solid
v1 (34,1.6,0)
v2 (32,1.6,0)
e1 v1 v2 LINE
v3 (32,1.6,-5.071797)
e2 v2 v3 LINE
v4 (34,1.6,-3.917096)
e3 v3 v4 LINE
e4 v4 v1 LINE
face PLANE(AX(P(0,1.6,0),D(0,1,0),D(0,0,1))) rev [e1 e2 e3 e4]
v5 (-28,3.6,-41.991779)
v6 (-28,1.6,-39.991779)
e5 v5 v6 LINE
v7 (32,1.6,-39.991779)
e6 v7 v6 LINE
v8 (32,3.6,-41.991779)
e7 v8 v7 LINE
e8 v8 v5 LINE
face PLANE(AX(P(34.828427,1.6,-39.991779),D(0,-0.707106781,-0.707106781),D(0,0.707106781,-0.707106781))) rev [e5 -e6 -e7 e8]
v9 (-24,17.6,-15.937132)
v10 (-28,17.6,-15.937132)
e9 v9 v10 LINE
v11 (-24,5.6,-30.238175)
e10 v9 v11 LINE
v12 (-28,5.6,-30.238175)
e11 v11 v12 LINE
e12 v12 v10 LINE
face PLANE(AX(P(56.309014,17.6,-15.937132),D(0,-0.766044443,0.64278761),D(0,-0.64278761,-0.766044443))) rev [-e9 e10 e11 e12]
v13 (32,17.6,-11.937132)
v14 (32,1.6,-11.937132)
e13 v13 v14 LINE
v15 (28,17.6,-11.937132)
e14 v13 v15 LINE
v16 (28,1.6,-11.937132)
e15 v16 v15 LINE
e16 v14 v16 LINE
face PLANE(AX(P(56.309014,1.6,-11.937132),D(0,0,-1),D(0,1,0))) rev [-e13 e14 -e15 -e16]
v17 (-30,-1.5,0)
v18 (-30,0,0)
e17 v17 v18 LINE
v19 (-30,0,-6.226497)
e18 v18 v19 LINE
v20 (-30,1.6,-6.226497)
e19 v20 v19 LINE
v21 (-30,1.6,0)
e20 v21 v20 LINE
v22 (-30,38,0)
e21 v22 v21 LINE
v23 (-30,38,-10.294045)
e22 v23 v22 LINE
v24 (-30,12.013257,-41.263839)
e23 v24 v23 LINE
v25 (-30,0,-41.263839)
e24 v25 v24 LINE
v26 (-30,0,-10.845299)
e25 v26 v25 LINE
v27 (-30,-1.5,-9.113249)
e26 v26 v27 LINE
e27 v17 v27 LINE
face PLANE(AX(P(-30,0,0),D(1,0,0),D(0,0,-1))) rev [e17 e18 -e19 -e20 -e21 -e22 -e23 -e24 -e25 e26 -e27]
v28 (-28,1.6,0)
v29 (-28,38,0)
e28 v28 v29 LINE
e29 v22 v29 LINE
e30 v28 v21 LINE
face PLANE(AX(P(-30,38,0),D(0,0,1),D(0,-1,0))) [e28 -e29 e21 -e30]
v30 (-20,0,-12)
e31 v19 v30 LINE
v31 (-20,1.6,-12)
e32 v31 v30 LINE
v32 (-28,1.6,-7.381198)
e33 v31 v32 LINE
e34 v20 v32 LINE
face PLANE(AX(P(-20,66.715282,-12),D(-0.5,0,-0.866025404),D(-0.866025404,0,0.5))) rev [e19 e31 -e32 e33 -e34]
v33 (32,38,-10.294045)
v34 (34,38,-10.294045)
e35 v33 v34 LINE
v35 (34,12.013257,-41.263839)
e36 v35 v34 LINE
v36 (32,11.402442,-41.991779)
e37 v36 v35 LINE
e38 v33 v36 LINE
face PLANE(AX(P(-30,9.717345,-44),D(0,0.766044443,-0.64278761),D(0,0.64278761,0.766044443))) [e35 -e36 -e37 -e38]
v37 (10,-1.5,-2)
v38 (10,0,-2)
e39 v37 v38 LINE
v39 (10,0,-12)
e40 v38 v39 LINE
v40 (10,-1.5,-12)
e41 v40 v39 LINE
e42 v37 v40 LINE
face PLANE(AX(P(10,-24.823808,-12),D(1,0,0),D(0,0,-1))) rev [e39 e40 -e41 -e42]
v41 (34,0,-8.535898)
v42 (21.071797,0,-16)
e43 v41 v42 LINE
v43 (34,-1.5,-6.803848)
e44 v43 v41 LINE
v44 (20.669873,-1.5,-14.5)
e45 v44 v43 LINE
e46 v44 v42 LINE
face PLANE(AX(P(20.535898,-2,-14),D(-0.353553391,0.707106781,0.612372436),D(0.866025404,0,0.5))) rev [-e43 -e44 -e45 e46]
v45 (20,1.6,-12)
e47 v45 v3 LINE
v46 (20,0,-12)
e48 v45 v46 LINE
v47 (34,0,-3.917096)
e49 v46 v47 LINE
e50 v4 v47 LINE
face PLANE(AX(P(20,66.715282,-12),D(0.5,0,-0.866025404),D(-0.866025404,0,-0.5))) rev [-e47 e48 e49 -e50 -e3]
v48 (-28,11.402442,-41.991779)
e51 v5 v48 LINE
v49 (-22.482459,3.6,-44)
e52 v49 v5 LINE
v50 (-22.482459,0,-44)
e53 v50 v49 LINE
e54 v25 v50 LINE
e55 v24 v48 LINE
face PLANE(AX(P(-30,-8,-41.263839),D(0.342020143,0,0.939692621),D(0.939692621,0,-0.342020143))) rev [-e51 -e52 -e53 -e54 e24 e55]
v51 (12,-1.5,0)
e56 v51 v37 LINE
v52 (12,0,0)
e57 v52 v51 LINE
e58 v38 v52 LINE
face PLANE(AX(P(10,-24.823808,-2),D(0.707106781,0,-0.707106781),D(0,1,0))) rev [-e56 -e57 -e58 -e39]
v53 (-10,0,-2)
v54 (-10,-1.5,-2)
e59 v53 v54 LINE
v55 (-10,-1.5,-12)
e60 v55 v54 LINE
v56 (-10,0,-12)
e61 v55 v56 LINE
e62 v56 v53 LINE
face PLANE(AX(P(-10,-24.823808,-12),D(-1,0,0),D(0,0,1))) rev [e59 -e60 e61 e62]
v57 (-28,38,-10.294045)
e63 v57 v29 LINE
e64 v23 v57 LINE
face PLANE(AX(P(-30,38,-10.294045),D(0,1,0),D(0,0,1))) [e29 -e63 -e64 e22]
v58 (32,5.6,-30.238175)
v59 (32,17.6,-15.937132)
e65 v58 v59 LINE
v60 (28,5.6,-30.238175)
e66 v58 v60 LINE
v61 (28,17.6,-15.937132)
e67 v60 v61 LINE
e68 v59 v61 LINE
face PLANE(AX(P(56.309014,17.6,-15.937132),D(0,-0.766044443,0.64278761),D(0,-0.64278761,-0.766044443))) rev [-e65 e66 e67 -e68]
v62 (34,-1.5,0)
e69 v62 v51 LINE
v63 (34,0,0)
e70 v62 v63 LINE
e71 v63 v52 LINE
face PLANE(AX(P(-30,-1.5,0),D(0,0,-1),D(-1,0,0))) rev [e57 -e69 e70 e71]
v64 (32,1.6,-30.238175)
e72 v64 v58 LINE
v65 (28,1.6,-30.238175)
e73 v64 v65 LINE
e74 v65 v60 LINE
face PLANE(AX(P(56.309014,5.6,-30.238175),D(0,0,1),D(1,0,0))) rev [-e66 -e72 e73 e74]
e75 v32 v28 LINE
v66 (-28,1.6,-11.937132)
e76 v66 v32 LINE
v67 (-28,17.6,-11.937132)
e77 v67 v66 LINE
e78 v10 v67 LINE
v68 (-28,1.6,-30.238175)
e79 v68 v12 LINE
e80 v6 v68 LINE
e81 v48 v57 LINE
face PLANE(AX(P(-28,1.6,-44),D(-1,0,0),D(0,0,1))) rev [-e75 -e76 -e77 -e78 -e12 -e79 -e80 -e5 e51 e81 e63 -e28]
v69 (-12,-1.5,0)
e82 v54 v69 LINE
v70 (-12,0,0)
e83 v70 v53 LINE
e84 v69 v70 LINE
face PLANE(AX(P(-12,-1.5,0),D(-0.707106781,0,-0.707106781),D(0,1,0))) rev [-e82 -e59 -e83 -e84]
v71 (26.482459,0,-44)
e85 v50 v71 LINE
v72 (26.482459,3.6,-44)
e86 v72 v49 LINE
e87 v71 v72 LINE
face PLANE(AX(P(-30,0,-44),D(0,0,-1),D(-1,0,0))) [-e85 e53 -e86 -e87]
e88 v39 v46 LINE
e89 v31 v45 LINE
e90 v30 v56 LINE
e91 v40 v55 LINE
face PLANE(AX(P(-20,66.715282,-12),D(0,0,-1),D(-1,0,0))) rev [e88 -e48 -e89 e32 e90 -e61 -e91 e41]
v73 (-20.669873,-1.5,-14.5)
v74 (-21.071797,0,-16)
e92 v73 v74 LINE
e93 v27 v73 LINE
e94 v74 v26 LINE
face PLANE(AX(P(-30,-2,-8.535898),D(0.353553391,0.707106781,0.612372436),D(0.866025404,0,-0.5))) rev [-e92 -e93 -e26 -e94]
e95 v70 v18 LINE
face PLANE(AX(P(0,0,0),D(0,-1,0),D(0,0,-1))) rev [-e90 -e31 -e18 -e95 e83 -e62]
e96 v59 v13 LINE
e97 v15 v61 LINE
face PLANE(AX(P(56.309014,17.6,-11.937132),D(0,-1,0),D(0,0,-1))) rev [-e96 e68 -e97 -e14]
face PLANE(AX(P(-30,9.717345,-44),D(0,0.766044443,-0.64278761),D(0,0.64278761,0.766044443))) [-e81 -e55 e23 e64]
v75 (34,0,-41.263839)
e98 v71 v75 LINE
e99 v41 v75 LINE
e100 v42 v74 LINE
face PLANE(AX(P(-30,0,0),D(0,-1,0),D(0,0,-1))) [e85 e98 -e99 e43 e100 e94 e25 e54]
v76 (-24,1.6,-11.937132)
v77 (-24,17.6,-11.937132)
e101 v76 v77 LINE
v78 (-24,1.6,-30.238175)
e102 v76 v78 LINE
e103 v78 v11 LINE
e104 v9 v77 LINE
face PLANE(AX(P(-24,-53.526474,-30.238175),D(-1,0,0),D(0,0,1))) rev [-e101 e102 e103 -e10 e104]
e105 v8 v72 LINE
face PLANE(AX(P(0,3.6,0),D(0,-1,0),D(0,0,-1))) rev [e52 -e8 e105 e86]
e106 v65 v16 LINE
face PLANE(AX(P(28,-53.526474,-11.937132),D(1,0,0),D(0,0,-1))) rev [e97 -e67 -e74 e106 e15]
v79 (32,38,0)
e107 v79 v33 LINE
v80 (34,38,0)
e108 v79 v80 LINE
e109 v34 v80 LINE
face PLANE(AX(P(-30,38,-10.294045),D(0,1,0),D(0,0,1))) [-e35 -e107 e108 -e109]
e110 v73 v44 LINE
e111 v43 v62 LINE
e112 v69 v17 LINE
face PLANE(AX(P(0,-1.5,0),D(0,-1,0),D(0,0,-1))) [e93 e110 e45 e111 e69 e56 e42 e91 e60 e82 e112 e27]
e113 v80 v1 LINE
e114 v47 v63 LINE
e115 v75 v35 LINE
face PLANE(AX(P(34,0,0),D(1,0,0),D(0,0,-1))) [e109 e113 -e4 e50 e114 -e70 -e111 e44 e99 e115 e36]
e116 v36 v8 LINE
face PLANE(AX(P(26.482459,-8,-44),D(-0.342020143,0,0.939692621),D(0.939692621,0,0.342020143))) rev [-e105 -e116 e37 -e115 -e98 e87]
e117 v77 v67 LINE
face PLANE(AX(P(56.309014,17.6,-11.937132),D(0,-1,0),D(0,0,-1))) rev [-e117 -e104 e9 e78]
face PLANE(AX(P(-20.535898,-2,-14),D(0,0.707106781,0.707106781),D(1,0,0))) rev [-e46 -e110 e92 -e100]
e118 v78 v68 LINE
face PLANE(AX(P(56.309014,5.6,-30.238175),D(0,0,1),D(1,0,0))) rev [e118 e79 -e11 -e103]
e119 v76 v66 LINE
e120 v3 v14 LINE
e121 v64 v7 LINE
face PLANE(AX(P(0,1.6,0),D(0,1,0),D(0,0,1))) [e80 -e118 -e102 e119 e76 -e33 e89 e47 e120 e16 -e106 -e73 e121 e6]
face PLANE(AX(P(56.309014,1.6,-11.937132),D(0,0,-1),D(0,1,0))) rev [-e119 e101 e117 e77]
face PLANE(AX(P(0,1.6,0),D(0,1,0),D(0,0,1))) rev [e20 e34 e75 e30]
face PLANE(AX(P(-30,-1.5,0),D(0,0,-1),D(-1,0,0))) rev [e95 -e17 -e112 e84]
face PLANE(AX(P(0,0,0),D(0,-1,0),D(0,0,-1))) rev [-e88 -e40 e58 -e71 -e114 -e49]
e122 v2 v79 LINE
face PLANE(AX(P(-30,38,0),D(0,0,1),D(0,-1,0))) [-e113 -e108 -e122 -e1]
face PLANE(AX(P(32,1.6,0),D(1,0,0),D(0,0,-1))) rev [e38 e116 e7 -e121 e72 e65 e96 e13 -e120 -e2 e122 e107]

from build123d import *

# Parameters (mm, degrees)
BOSS_EXTRUDE1_DEPTH      = 34
BOSS_EXTRUDE1_DEPTH_BACK = 30
SKETCH2_W                = 60
SKETCH2_H                = 44
CUT_EXTRUDE1_DEPTH       = 36.4
CUT_EXTRUDE2_DEPTH       = 1.6
BOSS_EXTRUDE2_DEPTH      = 1.5
CHAMFER1_SIZE            = 2
CUT_EXTRUDE3_REACH       = 70.207
SKETCH8_W                = 20
SKETCH8_H                = 12
CUT_EXTRUDE4_DEPTH       = 1.5
BOSS_EXTRUDE3_REACH      = 86.994
CUT_EXTRUDE7_REACH       = 61.23
SKETCH12_W               = 52
SKETCH12_H               = 18.301043111
CHAMFER2_SIZE            = 2
BOSS_EXTRUDE4_DEPTH      = 60
BOSS_EXTRUDE5_DEPTH      = 2


with BuildPart() as part:
    # Sketch1 → Boss-Extrude1 (new, two sides: drawn at the far end of the back side and taken through both)
    with BuildSketch(Plane(origin=(0, 0, 0), x_dir=(0, 0, -1), z_dir=(1, 0, 0)).offset(-BOSS_EXTRUDE1_DEPTH_BACK)):
        Polygon((0, 38), (0, 0), (44, 0), (44, 9.717345174), (10.294044503, 38), align=None)
    extrude(amount=BOSS_EXTRUDE1_DEPTH + BOSS_EXTRUDE1_DEPTH_BACK)

    # Sketch2 → Cut-Extrude1 (cut)
    with BuildSketch(Plane(origin=(0, 38, 0), x_dir=(1, 0, 0), z_dir=(0, 1, 0))):
        with Locations((2, 22)):
            Rectangle(SKETCH2_W, SKETCH2_H)
    extrude(amount=-CUT_EXTRUDE1_DEPTH, mode=Mode.SUBTRACT)

    # Sketch5 → Cut-Extrude2 (cut)
    with BuildSketch(Plane.XZ):
        Polygon((-20, -12), (20, -12), (34, -3.917096231), (34, 0), (-30, 0), (-30, -6.226497308), align=None)
    extrude(amount=-CUT_EXTRUDE2_DEPTH, mode=Mode.SUBTRACT)

    # Sketch6 → Boss-Extrude2 (add)
    with BuildSketch(Plane.XZ):
        Polygon((-30, 0), (-30, -8.535898385), (-20.535898385, -14), (20.535898385, -14), (34, -6.226497308), (34, 0), align=None)
    extrude(amount=BOSS_EXTRUDE2_DEPTH)

    # Chamfer1
    # the kernel refuses this chamfer: 2 mm, written as the material it adds along each edge
    with BuildSketch(Plane(origin=(16.081612789, 0, -16.571682988), x_dir=(0.4998109584556485, 0.027495876610586344, -0.8656979742248803), z_dir=(0.8660254037844386, 0, 0.5000000000000001))) as chamfer1_piece_1_section:
        Polygon((CHAMFER1_SIZE * 0.999621916911, -CHAMFER1_SIZE * 0.0274958766106), (-CHAMFER1_SIZE * 0.0274958766106, -CHAMFER1_SIZE * 0.999621916911), (0, 0), align=None)
    chamfer1_piece_1 = extrude(amount=25.833737336, mode=Mode.PRIVATE)
    chamfer1_piece_1 = split(chamfer1_piece_1, bisect_by=Plane(origin=(34, -0.590941393, -10.495986371), z_dir=(-1, 0, 0)), keep=Keep.TOP, mode=Mode.PRIVATE)
    chamfer1_piece_1 = split(chamfer1_piece_1, bisect_by=Plane(origin=(27.930870364, -0.590941393, -14), z_dir=(0, 0, 1)), keep=Keep.TOP, mode=Mode.PRIVATE)
    chamfer1_piece_1 = split(chamfer1_piece_1, bisect_by=Plane(origin=(27.930870364, -1.5, -10.495986371), z_dir=(0, 1, 0)), keep=Keep.TOP, mode=Mode.PRIVATE)
    add(chamfer1_piece_1)
    with BuildSketch(Plane(origin=(-34.454285596, 0, -5.964215397), x_dir=(-0.4998109584556484, 0.027495876610586348, -0.8656979742248804), z_dir=(0.8660254037844387, 0, -0.5))) as chamfer1_piece_2_section:
        Polygon((CHAMFER1_SIZE * 0.999621916911, -CHAMFER1_SIZE * 0.0274958766106), (-CHAMFER1_SIZE * 0.0274958766106, -CHAMFER1_SIZE * 0.999621916911), (0, 0), align=None)
    chamfer1_piece_2 = extrude(amount=21.214935182, mode=Mode.PRIVATE)
    chamfer1_piece_2 = split(chamfer1_piece_2, bisect_by=Plane(origin=(-30, -0.598869914, -11.638934736), z_dir=(1, 0, 0)), keep=Keep.TOP, mode=Mode.PRIVATE)
    chamfer1_piece_2 = split(chamfer1_piece_2, bisect_by=Plane(origin=(-25.910515002, -1.5, -11.638934736), z_dir=(0, 1, 0)), keep=Keep.TOP, mode=Mode.PRIVATE)
    chamfer1_piece_2 = split(chamfer1_piece_2, bisect_by=Plane(origin=(-25.910515002, -0.598869914, -14), z_dir=(0, 0, 1)), keep=Keep.TOP, mode=Mode.PRIVATE)
    add(chamfer1_piece_2)
    with BuildSketch(Plane(origin=(-25.679264361, 0, -14), x_dir=(0, 0.027495876610586424, -0.9996219169112968), z_dir=(1, 0, 0))) as chamfer1_piece_3_section:
        Polygon((CHAMFER1_SIZE * 0.999621916911, -CHAMFER1_SIZE * 0.0274958766106), (-CHAMFER1_SIZE * 0.0274958766106, -CHAMFER1_SIZE * 0.999621916911), (0, 0), align=None)
    chamfer1_piece_3 = extrude(amount=51.358528722, mode=Mode.PRIVATE)
    chamfer1_piece_3 = split(chamfer1_piece_3, bisect_by=Plane(origin=(4.838764491, -0.58360414, -23.062744479), z_dir=(-0.5000000000000001, 0, 0.8660254037844386)), keep=Keep.TOP, mode=Mode.PRIVATE)
    chamfer1_piece_3 = split(chamfer1_piece_3, bisect_by=Plane(origin=(0, -1.5, -14.681758534), z_dir=(0, 1, 0)), keep=Keep.TOP, mode=Mode.PRIVATE)
    chamfer1_piece_3 = split(chamfer1_piece_3, bisect_by=Plane(origin=(-4.838764491, -0.58360414, -23.062744479), z_dir=(0.5, 0, 0.8660254037844387)), keep=Keep.TOP, mode=Mode.PRIVATE)
    add(chamfer1_piece_3)
    with BuildSketch(Plane(origin=(16.081612789, 0, -16.571682988), x_dir=(0.4998109584556485, 0.027495876610586344, -0.8656979742248803), z_dir=(0.8660254037844386, 0, 0.5000000000000001))) as chamfer1_piece_4a_section:
        Polygon((CHAMFER1_SIZE * 0.999621916911, -CHAMFER1_SIZE * 0.0274958766106), (-CHAMFER1_SIZE * 0.0274958766106, -CHAMFER1_SIZE * 0.999621916911), (0, 0), align=None)
    chamfer1_piece_4a = extrude(amount=25.833737336, mode=Mode.PRIVATE)
    chamfer1_piece_4a = split(chamfer1_piece_4a, bisect_by=Plane(origin=(19.272748758, -0.548768343, -14), z_dir=(0, 0, -1)), keep=Keep.TOP, mode=Mode.PRIVATE)
    chamfer1_piece_4a = split(chamfer1_piece_4a, bisect_by=Plane(origin=(19.272748758, -1.5, -15.619778524), z_dir=(0, 1, 0)), keep=Keep.TOP, mode=Mode.PRIVATE)
    with BuildSketch(Plane(origin=(-25.679264361, 0, -14), x_dir=(0, 0.027495876610586424, -0.9996219169112968), z_dir=(1, 0, 0))) as chamfer1_piece_4b_section:
        Polygon((CHAMFER1_SIZE * 0.999621916911, -CHAMFER1_SIZE * 0.0274958766106), (-CHAMFER1_SIZE * 0.0274958766106, -CHAMFER1_SIZE * 0.999621916911), (0, 0), align=None)
    chamfer1_piece_4b = extrude(amount=51.358528722, mode=Mode.PRIVATE)
    chamfer1_piece_4b = split(chamfer1_piece_4b, bisect_by=Plane(origin=(21.62981805, -0.548768343, -13.368425187), z_dir=(0.5000000000000001, 0, -0.8660254037844386)), keep=Keep.TOP, mode=Mode.PRIVATE)
    chamfer1_piece_4b = split(chamfer1_piece_4b, bisect_by=Plane(origin=(22.439707312, -1.5, -14.771194537), z_dir=(0, 1, 0)), keep=Keep.TOP, mode=Mode.PRIVATE)
    chamfer1_piece_4 = chamfer1_piece_4a & chamfer1_piece_4b
    add(chamfer1_piece_4)
    with BuildSketch(Plane(origin=(-25.679264361, 0, -14), x_dir=(0, 0.027495876610586424, -0.9996219169112968), z_dir=(1, 0, 0))) as chamfer1_piece_5a_section:
        Polygon((CHAMFER1_SIZE * 0.999621916911, -CHAMFER1_SIZE * 0.0274958766106), (-CHAMFER1_SIZE * 0.0274958766106, -CHAMFER1_SIZE * 0.999621916911), (0, 0), align=None)
    chamfer1_piece_5a = extrude(amount=51.358528722, mode=Mode.PRIVATE)
    chamfer1_piece_5a = split(chamfer1_piece_5a, bisect_by=Plane(origin=(-22.439707312, -1.5, -14.771194537), z_dir=(0, 1, 0)), keep=Keep.TOP, mode=Mode.PRIVATE)
    chamfer1_piece_5a = split(chamfer1_piece_5a, bisect_by=Plane(origin=(-21.62981805, -0.548768343, -13.368425187), z_dir=(-0.5, 0, -0.8660254037844387)), keep=Keep.TOP, mode=Mode.PRIVATE)
    with BuildSketch(Plane(origin=(-34.454285596, 0, -5.964215397), x_dir=(-0.4998109584556484, 0.027495876610586348, -0.8656979742248804), z_dir=(0.8660254037844387, 0, -0.5))) as chamfer1_piece_5b_section:
        Polygon((CHAMFER1_SIZE * 0.999621916911, -CHAMFER1_SIZE * 0.0274958766106), (-CHAMFER1_SIZE * 0.0274958766106, -CHAMFER1_SIZE * 0.999621916911), (0, 0), align=None)
    chamfer1_piece_5b = extrude(amount=21.214935182, mode=Mode.PRIVATE)
    chamfer1_piece_5b = split(chamfer1_piece_5b, bisect_by=Plane(origin=(-19.272748758, -1.5, -15.619778524), z_dir=(0, 1, 0)), keep=Keep.TOP, mode=Mode.PRIVATE)
    chamfer1_piece_5b = split(chamfer1_piece_5b, bisect_by=Plane(origin=(-19.272748758, -0.548768343, -14), z_dir=(0, 0, -1)), keep=Keep.TOP, mode=Mode.PRIVATE)
    chamfer1_piece_5 = chamfer1_piece_5a & chamfer1_piece_5b
    add(chamfer1_piece_5)

    # Cut-Extrude3: up to this face of the body (flat: up to its plane)
    cut_extrude3_end = Plane(part.part.faces().sort_by_distance((2.35859889, 0, -29.378927014))[0])
    # Sketch7 → Cut-Extrude3 (cut, up to the picked face)
    with BuildSketch(Plane(origin=(0, 38, 0), x_dir=(1, 0, 0), z_dir=(0, 1, 0)), mode=Mode.PRIVATE) as cut_extrude3_sk1:
        Polygon((-30, 41.263838853), (-22.482459034, 44), (-30, 44), align=None)
    cut_extrude3_tool1 = split(extrude(cut_extrude3_sk1.sketch, amount=-CUT_EXTRUDE3_REACH, mode=Mode.PRIVATE), bisect_by=cut_extrude3_end, keep=Keep.BOTH, mode=Mode.PRIVATE)
    # Sketch7 → Cut-Extrude3 (cut, up to the picked face)
    with BuildSketch(Plane(origin=(0, 38, 0), x_dir=(1, 0, 0), z_dir=(0, 1, 0)), mode=Mode.PRIVATE) as cut_extrude3_sk2:
        Polygon((26.482459034, 44), (34, 41.263838853), (34, 44), align=None)
    cut_extrude3_tool2 = split(extrude(cut_extrude3_sk2.sketch, amount=-CUT_EXTRUDE3_REACH, mode=Mode.PRIVATE), bisect_by=cut_extrude3_end, keep=Keep.BOTH, mode=Mode.PRIVATE)
    add(cut_extrude3_tool1.solids().sort_by(Axis((-27.494153, 38, -43.087946), (0, -1, 0)))[0], mode=Mode.SUBTRACT)
    add(cut_extrude3_tool2.solids().sort_by(Axis((31.494153, 38, -43.087946), (0, -1, 0)))[0], mode=Mode.SUBTRACT)

    # Sketch8 → Cut-Extrude4 (cut)
    with BuildSketch(Plane(origin=(0, 0, 0), x_dir=(1, 0, 0), z_dir=(0, 1, 0))):
        with Locations((0, 6)):
            Rectangle(SKETCH8_W, SKETCH8_H)
    extrude(amount=-CUT_EXTRUDE4_DEPTH, mode=Mode.SUBTRACT)

    # Boss-Extrude3: up to this face of the body (flat: up to its plane)
    boss_extrude3_end = Plane(part.part.faces().sort_by_distance((32, 16.245464339, -17.024050876))[0])
    # Sketch11 → Boss-Extrude3 (add, up to the picked face)
    with BuildSketch(Plane(origin=(-28, 0, 0), x_dir=(0, 0, -1), z_dir=(1, 0, 0)), mode=Mode.PRIVATE) as boss_extrude3_sk1:
        Polygon((15.937131869, 17.6), (30.23817498, 5.6), (30.23817498, 1.6), (11.937131869, 1.6), (11.937131869, 17.6), align=None)
    boss_extrude3_tool1 = split(extrude(boss_extrude3_sk1.sketch, amount=BOSS_EXTRUDE3_REACH, mode=Mode.PRIVATE), bisect_by=boss_extrude3_end, keep=Keep.BOTH, mode=Mode.PRIVATE)
    add(boss_extrude3_tool1.solids().sort_by(Axis((-28, 7.941992, -19.27068), (1, 0, 0)))[0])

    # Cut-Extrude7: up to this face of the body (flat: up to its plane)
    cut_extrude7_end = Plane(part.part.faces().sort_by_distance((2, 1.6, -37.034599694))[0])
    # Sketch12 → Cut-Extrude7 (cut, up to the picked face)
    with BuildSketch(Plane(origin=(0, 17.6, 0), x_dir=(1, 0, 0), z_dir=(0, 1, 0)), mode=Mode.PRIVATE) as cut_extrude7_sk1:
        with Locations((2, 21.087653425)):
            Rectangle(SKETCH12_W, SKETCH12_H)
    cut_extrude7_tool1 = split(extrude(cut_extrude7_sk1.sketch, amount=-CUT_EXTRUDE7_REACH, mode=Mode.PRIVATE), bisect_by=cut_extrude7_end, keep=Keep.BOTH, mode=Mode.PRIVATE)
    add(cut_extrude7_tool1.solids().sort_by(Axis((2, 17.6, -21.087653), (0, -1, 0)))[0], mode=Mode.SUBTRACT)

    # Chamfer2
    chamfer2_edges = [part.edges().sort_by_distance(p)[0] for p in [
        (10, -0.75, 0),
        (-10, -0.75, 0),
    ]]
    chamfer(chamfer2_edges, length=CHAMFER2_SIZE)

    # Sketch14 → Boss-Extrude4 (add)
    with BuildSketch(Plane(origin=(-28, 0, 0), x_dir=(0, 0, -1), z_dir=(1, 0, 0))):
        Polygon((41.991779322, 3.6), (41.991779322, 1.6), (39.991779322, 1.6), align=None)
    extrude(amount=BOSS_EXTRUDE4_DEPTH)

    # Sketch15 → Boss-Extrude5 (add)
    with BuildSketch(Plane(origin=(0, 1.6, 0), x_dir=(1, 0, 0), z_dir=(0, 1, 0))):
        Polygon((-28, 41.991779322), (32, 41.991779322), (26.482459034, 44), (-22.482459034, 44), align=None)
    extrude(amount=BOSS_EXTRUDE5_DEPTH)


solid = part.part
